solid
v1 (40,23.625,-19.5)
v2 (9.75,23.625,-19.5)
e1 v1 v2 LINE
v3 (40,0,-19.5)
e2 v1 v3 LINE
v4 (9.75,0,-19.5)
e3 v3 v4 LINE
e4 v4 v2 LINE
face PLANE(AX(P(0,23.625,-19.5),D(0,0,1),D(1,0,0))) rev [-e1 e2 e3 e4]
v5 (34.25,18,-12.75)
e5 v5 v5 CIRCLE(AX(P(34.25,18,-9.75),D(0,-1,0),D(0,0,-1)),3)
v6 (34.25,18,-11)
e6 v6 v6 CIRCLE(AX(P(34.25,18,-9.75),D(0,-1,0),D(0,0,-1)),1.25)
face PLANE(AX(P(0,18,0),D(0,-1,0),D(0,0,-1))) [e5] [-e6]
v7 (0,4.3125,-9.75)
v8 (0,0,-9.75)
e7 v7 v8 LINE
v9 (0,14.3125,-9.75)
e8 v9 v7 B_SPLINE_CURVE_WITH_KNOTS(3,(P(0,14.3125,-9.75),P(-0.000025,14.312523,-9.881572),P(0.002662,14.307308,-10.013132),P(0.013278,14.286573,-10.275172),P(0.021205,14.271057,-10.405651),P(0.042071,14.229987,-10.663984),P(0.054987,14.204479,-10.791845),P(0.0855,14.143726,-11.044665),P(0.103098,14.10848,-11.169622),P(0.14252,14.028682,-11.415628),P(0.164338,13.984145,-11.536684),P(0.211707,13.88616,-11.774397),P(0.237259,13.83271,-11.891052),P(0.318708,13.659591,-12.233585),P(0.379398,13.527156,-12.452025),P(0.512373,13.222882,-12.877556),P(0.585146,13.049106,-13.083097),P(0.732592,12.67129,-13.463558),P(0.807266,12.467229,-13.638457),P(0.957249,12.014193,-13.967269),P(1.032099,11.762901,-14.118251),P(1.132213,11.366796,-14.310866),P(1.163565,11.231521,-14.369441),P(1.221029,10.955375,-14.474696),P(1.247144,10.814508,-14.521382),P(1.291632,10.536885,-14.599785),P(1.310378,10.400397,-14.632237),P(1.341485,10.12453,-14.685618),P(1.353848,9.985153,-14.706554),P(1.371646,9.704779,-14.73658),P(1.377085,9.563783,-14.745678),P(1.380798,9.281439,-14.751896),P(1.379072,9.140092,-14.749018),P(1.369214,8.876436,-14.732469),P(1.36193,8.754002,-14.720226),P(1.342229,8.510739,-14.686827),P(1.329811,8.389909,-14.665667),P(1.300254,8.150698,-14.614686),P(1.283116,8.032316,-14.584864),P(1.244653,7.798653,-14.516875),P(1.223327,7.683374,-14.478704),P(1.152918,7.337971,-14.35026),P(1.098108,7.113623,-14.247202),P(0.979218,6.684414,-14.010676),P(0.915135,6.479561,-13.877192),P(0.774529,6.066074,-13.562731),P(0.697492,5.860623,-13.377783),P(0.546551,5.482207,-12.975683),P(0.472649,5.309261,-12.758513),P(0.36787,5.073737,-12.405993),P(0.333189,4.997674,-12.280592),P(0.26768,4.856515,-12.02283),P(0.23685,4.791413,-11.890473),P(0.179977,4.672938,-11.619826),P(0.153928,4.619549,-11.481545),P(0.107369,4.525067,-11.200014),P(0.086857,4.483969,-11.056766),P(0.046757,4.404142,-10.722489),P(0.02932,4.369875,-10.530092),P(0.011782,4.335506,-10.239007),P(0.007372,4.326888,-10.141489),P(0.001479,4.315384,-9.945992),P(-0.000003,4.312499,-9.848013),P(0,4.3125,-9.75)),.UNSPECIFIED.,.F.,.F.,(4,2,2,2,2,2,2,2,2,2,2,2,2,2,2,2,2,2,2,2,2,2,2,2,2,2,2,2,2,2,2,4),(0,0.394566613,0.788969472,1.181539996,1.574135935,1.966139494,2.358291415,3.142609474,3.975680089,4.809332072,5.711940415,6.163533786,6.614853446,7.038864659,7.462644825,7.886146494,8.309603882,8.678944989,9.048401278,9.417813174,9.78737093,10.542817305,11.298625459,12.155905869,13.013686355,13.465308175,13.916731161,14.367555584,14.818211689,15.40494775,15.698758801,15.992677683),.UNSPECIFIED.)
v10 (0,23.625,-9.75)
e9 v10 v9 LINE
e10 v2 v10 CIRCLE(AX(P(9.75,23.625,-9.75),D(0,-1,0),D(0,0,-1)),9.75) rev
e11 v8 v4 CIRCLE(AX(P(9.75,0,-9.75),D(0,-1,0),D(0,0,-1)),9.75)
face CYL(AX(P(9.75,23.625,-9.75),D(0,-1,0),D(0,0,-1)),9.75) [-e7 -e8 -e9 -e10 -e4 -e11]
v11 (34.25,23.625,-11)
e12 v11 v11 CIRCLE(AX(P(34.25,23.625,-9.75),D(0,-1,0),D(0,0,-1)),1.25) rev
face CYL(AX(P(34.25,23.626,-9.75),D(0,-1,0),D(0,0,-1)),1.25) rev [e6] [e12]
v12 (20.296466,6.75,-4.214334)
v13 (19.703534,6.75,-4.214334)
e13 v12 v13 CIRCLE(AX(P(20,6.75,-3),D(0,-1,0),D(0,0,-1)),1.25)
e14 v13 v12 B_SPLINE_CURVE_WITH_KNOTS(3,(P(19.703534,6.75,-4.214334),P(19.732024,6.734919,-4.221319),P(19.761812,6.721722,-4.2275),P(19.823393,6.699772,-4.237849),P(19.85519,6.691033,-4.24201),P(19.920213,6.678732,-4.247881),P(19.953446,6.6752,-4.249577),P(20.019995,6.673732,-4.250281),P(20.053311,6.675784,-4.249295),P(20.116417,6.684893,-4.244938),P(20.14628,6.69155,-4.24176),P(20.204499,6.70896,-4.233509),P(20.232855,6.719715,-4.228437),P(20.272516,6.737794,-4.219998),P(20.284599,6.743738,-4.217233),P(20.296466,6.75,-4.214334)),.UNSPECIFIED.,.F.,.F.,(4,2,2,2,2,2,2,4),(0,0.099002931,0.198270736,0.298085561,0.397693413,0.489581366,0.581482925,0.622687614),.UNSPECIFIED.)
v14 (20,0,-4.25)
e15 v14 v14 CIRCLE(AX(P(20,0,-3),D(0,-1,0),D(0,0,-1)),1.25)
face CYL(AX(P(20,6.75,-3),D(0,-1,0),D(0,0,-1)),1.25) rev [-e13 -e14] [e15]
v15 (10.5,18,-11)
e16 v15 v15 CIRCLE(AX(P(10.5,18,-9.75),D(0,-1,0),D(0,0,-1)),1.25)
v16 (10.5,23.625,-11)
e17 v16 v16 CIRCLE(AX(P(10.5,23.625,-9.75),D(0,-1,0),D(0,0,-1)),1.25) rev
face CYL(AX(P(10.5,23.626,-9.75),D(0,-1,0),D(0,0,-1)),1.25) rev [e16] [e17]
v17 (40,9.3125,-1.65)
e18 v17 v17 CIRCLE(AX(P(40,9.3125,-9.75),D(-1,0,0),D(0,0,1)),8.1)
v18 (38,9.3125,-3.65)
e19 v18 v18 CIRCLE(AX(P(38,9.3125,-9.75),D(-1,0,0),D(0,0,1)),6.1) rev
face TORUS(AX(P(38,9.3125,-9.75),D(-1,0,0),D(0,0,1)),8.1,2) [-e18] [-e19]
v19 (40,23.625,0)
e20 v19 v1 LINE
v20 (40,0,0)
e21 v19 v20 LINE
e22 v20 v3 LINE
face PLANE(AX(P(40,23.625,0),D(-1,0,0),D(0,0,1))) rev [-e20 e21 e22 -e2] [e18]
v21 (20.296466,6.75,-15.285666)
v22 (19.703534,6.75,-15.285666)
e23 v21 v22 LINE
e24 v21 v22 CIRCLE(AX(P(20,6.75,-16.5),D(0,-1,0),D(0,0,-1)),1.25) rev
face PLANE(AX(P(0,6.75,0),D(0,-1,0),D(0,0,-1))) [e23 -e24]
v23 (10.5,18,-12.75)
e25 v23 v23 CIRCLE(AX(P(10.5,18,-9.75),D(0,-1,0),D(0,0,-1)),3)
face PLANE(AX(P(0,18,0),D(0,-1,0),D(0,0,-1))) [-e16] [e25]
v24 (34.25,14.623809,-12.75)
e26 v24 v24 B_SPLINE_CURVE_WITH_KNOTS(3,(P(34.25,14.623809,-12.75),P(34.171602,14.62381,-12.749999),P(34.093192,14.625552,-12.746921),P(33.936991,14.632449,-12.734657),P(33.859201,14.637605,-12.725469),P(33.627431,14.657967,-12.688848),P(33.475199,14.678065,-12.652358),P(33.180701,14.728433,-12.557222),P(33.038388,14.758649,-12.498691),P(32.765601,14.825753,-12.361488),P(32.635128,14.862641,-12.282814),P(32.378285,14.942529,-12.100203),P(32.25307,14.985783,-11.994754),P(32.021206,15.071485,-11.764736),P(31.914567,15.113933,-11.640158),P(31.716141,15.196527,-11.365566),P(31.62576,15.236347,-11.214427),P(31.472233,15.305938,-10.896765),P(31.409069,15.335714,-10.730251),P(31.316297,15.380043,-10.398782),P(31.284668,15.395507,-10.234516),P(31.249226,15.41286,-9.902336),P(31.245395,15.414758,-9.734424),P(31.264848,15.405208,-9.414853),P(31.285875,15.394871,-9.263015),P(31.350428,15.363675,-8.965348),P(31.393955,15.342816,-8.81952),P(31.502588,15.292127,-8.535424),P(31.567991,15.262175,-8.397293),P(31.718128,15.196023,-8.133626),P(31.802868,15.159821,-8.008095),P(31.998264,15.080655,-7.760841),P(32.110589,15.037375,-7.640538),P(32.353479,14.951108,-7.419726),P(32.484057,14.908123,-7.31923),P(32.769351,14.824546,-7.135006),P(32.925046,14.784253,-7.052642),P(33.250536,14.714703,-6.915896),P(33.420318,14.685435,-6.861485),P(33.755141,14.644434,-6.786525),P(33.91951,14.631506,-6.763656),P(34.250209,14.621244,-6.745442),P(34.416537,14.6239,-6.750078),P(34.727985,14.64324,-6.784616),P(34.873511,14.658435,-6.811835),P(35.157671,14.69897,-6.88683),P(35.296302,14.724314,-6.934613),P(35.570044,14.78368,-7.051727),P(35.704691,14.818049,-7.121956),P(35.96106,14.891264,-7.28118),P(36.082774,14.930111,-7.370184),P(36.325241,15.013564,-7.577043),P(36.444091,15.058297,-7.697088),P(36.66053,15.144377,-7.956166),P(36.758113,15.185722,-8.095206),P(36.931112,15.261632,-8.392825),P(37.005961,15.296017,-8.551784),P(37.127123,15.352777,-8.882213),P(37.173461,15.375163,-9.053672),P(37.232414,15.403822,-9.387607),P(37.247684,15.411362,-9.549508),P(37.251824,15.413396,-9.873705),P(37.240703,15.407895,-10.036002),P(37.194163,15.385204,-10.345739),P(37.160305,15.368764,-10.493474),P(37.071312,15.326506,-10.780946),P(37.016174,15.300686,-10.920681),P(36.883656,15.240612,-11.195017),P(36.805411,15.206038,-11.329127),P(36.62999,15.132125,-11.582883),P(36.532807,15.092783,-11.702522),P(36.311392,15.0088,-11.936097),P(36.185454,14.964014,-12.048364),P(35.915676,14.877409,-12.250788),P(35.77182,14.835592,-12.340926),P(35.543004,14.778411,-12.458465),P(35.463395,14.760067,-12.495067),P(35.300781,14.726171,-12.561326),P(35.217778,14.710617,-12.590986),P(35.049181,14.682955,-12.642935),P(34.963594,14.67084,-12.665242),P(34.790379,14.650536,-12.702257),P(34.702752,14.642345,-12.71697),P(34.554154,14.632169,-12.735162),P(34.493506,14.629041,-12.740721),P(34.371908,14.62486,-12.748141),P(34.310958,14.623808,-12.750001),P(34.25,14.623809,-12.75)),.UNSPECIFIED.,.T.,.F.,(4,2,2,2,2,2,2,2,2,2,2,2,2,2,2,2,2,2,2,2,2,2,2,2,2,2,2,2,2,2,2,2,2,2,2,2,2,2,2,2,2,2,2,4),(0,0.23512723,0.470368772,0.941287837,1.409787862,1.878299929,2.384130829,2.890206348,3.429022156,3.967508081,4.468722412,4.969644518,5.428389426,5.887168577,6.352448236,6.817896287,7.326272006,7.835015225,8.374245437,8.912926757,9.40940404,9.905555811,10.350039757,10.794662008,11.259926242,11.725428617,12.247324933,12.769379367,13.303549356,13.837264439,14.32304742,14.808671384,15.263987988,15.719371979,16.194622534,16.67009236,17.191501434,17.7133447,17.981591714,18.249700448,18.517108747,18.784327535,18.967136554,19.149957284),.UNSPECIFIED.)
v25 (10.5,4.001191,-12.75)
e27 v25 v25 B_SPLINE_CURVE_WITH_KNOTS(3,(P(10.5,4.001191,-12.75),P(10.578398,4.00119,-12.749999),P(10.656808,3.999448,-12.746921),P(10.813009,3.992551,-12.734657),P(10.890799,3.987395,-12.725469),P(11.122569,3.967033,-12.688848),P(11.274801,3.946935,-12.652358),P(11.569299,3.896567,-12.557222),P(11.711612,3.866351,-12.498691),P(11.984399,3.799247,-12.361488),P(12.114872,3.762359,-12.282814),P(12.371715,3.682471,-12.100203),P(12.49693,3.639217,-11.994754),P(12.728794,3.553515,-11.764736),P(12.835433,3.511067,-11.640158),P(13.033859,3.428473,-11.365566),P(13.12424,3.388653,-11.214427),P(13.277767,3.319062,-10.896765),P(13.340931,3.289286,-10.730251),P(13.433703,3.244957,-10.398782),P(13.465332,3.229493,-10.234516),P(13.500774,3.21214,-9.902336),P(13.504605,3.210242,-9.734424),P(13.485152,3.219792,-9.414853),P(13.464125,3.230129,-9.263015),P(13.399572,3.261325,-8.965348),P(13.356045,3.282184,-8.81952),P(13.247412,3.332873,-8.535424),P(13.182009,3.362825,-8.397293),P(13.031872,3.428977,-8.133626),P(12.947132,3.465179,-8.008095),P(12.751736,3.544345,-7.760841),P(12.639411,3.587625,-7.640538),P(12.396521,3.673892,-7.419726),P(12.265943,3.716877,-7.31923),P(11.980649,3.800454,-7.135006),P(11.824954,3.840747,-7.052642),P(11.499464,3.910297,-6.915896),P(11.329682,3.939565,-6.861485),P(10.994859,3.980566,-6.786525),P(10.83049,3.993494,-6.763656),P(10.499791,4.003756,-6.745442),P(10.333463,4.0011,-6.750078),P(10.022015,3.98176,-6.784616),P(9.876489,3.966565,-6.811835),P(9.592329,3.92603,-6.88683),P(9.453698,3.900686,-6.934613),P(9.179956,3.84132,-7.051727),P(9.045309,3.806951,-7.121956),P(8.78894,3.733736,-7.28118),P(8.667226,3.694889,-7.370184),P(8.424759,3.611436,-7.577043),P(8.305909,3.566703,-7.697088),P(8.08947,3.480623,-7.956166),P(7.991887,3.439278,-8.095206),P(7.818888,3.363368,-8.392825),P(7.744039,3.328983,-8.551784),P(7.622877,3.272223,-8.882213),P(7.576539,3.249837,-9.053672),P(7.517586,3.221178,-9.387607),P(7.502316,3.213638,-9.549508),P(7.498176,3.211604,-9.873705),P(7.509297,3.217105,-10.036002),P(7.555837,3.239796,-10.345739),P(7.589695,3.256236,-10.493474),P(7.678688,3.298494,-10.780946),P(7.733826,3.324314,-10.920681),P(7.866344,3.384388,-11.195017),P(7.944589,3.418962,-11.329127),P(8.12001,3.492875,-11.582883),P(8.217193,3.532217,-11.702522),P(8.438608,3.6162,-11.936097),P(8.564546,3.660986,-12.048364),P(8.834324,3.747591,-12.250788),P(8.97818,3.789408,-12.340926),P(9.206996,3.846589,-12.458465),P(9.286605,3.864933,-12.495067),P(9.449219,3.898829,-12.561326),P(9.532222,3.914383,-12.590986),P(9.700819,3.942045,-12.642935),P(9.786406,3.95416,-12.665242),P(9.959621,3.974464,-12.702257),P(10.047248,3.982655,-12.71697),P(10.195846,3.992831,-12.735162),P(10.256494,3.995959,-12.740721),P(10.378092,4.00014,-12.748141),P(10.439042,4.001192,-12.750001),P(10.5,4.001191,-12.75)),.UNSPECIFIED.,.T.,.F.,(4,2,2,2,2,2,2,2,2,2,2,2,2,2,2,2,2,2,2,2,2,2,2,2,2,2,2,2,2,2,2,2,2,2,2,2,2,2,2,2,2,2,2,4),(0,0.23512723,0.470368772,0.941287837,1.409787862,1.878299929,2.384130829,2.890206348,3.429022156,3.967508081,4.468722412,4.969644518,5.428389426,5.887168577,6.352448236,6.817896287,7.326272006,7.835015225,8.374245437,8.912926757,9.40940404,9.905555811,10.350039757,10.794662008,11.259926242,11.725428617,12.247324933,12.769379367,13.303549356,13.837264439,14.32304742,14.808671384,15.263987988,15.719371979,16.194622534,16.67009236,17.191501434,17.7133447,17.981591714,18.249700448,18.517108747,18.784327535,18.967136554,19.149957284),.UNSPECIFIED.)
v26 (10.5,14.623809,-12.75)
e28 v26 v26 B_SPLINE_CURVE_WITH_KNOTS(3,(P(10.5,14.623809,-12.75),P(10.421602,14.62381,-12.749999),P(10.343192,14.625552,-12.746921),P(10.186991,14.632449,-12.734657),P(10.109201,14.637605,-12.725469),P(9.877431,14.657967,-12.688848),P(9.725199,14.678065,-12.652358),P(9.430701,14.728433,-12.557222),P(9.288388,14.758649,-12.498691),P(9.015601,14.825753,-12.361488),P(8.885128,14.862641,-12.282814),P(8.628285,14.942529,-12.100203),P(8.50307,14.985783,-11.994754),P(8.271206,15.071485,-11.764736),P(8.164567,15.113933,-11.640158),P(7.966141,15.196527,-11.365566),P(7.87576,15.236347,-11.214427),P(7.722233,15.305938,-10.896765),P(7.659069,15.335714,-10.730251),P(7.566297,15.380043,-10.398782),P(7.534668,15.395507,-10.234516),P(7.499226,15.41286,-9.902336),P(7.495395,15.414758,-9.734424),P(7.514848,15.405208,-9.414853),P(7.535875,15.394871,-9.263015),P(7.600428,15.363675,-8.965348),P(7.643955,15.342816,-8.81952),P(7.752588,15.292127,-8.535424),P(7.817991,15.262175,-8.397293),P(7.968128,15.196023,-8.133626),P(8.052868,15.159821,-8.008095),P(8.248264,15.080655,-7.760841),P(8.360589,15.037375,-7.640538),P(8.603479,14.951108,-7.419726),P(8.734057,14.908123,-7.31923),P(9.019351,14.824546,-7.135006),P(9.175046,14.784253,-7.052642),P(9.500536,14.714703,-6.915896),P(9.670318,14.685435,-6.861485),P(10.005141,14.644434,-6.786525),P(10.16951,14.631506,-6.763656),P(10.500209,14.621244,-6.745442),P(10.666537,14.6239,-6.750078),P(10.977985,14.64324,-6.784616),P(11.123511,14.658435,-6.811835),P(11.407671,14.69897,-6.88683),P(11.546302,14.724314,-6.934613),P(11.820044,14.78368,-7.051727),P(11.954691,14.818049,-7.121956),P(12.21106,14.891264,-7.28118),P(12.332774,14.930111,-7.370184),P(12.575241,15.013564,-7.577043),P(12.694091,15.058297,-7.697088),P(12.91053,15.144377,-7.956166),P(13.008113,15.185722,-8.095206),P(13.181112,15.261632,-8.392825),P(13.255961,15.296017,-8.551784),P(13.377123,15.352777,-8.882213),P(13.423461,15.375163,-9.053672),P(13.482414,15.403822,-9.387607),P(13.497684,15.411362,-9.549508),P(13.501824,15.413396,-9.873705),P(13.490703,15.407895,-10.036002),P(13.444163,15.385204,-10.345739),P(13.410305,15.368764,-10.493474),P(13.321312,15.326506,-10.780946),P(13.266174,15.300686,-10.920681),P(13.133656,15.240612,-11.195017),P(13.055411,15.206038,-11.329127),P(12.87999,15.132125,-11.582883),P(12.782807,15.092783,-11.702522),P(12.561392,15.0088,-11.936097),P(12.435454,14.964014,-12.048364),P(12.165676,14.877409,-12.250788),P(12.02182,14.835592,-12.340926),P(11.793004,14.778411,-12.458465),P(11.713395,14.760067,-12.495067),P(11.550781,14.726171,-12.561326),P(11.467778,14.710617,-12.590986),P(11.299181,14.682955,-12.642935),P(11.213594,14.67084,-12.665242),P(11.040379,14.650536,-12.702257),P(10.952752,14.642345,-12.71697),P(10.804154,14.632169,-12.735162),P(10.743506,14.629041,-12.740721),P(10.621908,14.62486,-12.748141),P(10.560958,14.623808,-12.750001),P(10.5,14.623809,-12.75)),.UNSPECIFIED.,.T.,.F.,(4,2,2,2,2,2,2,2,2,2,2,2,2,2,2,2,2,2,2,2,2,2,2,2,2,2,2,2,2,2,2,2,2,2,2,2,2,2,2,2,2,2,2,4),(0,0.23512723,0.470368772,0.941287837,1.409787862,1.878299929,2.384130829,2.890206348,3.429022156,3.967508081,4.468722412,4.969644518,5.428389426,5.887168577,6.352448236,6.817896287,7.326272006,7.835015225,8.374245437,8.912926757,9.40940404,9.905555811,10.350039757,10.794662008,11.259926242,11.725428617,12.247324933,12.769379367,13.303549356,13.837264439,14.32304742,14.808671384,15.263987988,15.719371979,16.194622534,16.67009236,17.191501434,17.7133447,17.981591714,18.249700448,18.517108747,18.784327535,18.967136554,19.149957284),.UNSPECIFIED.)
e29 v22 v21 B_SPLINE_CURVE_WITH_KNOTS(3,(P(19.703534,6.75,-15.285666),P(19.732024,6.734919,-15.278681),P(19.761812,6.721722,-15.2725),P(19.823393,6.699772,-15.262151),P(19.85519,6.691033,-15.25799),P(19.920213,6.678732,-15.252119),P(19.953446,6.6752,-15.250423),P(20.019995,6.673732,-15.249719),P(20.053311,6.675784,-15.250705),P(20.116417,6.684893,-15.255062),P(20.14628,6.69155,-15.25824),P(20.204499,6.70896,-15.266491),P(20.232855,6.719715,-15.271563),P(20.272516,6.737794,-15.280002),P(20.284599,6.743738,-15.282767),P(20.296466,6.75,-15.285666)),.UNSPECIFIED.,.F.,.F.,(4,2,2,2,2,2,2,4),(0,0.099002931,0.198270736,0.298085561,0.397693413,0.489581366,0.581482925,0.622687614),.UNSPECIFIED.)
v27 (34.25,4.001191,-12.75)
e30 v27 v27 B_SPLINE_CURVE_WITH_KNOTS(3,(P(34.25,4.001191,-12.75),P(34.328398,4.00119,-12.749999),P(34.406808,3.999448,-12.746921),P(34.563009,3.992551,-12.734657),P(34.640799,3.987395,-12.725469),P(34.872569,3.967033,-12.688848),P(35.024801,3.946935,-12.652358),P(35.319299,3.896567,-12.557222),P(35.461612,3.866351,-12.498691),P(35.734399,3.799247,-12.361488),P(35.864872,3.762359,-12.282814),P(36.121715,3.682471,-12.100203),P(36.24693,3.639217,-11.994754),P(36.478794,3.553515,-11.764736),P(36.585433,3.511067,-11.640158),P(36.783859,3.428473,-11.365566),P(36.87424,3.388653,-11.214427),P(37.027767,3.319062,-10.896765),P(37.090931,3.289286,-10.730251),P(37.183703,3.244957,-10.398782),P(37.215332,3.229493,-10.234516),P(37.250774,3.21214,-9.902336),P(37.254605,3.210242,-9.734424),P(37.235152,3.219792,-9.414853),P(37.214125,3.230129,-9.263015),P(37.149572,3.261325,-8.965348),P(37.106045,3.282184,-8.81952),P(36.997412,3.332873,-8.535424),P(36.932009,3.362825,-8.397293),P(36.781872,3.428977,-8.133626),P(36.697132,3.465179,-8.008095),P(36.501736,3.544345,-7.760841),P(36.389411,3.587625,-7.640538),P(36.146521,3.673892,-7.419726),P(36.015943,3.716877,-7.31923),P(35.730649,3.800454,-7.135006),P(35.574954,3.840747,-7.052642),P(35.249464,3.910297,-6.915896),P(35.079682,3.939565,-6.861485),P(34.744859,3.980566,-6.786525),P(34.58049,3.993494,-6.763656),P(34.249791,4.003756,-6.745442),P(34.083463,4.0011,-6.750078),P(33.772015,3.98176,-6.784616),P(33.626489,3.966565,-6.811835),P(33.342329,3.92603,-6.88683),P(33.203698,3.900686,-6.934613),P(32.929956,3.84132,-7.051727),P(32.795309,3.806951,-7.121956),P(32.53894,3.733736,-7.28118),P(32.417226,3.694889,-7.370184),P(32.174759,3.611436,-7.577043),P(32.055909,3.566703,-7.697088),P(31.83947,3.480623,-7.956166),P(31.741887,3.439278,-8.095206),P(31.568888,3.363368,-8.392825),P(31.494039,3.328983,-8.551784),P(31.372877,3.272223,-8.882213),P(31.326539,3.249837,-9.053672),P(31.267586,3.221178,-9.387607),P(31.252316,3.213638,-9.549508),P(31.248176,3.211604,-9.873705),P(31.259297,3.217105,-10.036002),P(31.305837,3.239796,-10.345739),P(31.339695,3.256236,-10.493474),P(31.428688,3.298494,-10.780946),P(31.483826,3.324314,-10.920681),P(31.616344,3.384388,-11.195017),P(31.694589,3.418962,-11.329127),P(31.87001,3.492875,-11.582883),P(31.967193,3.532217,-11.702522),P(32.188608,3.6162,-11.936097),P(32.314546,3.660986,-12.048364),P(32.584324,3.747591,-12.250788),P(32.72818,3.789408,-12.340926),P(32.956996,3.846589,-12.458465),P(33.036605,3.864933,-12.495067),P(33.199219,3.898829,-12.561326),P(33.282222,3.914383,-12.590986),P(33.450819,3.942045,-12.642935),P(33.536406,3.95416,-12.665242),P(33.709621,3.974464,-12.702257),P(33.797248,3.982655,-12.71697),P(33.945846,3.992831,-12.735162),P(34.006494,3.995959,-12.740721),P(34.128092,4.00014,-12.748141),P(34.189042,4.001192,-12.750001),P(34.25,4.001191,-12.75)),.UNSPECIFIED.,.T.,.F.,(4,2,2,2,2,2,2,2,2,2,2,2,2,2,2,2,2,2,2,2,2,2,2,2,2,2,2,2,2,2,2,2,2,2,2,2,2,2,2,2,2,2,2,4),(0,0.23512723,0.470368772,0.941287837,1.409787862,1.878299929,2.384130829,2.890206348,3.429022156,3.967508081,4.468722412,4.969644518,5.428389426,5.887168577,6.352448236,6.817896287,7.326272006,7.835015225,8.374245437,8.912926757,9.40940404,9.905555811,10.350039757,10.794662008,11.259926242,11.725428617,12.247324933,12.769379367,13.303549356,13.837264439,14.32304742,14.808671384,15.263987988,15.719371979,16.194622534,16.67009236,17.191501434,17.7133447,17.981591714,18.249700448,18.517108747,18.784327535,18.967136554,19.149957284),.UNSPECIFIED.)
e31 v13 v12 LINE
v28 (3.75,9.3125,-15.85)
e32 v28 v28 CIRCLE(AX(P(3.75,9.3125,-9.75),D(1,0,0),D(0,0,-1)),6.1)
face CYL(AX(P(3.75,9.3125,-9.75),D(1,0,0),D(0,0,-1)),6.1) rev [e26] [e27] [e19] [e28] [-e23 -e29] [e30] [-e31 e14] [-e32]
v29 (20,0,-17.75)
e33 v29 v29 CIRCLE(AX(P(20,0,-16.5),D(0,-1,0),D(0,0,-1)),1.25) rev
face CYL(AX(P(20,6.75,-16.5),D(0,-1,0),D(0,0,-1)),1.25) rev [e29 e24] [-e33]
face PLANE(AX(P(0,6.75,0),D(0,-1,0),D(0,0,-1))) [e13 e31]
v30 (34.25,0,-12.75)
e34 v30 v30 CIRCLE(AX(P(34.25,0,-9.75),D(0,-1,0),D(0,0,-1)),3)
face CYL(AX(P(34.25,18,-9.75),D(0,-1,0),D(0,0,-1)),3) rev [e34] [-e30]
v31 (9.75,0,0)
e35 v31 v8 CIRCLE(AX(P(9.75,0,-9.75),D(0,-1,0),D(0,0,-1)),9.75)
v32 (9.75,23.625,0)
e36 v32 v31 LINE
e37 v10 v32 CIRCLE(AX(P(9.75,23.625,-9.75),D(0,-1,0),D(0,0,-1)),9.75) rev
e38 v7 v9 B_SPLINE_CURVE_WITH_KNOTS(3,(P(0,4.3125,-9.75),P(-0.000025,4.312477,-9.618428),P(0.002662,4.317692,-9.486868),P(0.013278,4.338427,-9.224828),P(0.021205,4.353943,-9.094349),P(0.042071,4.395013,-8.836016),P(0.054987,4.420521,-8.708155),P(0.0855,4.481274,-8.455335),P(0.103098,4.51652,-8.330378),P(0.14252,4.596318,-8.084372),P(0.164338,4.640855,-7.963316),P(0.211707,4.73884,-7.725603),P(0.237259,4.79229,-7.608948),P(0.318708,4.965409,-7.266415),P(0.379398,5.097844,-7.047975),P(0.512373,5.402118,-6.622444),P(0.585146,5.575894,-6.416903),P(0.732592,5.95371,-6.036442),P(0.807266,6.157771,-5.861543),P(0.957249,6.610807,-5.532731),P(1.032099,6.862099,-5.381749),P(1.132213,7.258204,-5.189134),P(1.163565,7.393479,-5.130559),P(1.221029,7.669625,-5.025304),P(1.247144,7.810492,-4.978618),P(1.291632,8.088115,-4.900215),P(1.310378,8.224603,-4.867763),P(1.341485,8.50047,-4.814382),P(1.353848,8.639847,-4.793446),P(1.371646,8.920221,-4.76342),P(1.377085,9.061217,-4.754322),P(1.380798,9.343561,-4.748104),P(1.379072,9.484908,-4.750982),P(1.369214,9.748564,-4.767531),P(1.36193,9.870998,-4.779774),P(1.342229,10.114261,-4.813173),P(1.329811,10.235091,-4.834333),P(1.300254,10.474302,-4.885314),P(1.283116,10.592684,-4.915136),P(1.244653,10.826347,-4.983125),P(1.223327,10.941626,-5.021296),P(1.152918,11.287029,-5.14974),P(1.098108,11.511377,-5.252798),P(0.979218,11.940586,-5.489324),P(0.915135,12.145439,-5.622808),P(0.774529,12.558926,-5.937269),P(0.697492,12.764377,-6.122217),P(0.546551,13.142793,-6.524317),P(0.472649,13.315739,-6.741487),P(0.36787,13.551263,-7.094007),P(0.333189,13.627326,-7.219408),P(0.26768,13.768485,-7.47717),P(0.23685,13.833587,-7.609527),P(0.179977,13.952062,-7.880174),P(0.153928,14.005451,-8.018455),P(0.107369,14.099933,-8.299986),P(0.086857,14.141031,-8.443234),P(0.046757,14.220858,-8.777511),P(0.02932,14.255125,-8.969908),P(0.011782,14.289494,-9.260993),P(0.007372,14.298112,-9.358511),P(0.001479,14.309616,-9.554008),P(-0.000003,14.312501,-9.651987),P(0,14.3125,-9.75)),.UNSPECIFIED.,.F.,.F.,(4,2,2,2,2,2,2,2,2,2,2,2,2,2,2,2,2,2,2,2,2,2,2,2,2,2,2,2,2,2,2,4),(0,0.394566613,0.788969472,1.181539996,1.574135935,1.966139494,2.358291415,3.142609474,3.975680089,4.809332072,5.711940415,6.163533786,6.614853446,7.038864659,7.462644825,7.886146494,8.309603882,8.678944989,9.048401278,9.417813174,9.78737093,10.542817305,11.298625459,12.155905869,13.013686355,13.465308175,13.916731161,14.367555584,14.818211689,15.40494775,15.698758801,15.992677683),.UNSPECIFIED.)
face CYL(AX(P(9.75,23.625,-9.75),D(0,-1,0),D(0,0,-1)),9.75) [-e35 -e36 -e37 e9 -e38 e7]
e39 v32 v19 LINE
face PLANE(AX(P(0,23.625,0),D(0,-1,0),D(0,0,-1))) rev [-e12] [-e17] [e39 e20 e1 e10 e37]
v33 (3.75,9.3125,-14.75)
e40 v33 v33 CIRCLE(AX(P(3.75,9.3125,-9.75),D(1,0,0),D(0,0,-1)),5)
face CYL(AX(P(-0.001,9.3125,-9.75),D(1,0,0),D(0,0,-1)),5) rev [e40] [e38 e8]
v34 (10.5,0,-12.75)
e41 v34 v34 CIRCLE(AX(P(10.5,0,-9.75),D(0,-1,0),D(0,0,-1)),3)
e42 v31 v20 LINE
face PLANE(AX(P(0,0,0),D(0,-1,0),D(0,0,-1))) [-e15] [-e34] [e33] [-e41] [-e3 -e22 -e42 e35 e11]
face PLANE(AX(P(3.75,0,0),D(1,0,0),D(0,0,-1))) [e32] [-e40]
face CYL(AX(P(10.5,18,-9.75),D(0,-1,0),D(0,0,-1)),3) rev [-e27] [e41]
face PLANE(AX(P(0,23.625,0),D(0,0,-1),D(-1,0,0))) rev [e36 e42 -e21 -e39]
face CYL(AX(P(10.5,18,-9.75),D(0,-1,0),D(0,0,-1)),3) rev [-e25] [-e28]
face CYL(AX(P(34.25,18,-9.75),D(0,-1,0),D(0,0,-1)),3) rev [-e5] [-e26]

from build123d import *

# Parameters (mm, degrees)
SKETCH1_W           = 40
SKETCH1_H           = 19.5
BOSS_EXTRUDE1_DEPTH = 23.625
SKETCH2_R           = 6.1
CUT_EXTRUDE1_DEPTH  = 36.25
CUT_EXTRUDE2_REACH  = 49.46
SKETCH3_R           = 5
SKETCH5_R           = 3
CUT_EXTRUDE3_DEPTH  = 18
CUT_EXTRUDE4_REACH  = 50.003
SKETCH6_R           = 1.25
SKETCH7_R           = 1.25
CUT_EXTRUDE5_DEPTH  = 6.75
FILLET1_R           = 2
FILLET2_DEPTH       = 23.625


with BuildPart() as part:
    # Sketch1 → Boss-Extrude1 (new body)
    with BuildSketch(Plane(origin=(0, 0, 0), x_dir=(1, 0, 0), z_dir=(0, 1, 0))):
        with Locations((20, 9.75)):
            Rectangle(SKETCH1_W, SKETCH1_H)
    extrude(amount=BOSS_EXTRUDE1_DEPTH)

    # Sketch2 → Cut-Extrude1 (cut)
    with BuildSketch(Plane(origin=(40, 0, 0), x_dir=(0, 0, -1), z_dir=(1, 0, 0))):
        with Locations((9.75, 9.3125)):
            Circle(SKETCH2_R)
    extrude(amount=-CUT_EXTRUDE1_DEPTH, mode=Mode.SUBTRACT)

    # Sketch3 → Cut-Extrude2 (cut, up to next)
    with BuildSketch(Plane(origin=(3.75, 0, 0), x_dir=(0, 0, -1), z_dir=(1, 0, 0)), mode=Mode.PRIVATE) as cut_extrude2_sk1:
        with Locations((9.75, 9.3125)):
            Circle(SKETCH3_R)
    cut_extrude2_tool1 = extrude(cut_extrude2_sk1.sketch, amount=-CUT_EXTRUDE2_REACH, mode=Mode.PRIVATE) & part.part
    add(cut_extrude2_tool1.solids().sort_by_distance((3.75, 9.3125, -9.75))[0], mode=Mode.SUBTRACT)

    # Sketch5 → Cut-Extrude3 (cut)
    with BuildSketch(Plane.XZ):
        with Locations(Location((34.25, -9.75, 0), (0, 0, 270))):
            Circle(SKETCH5_R)
        with Locations(Location((10.5, -9.75, 0), (0, 0, 270))):
            Circle(SKETCH5_R)
    extrude(amount=-CUT_EXTRUDE3_DEPTH, mode=Mode.SUBTRACT)

    # Sketch6 → Cut-Extrude4 (cut, up to next)
    with BuildSketch(Plane.XZ.offset(-18), mode=Mode.PRIVATE) as cut_extrude4_sk1:
        with Locations(Location((10.5, -9.75, 0), (0, 0, 270))):
            Circle(SKETCH6_R)
    cut_extrude4_tool1 = extrude(cut_extrude4_sk1.sketch, amount=-CUT_EXTRUDE4_REACH, mode=Mode.PRIVATE) & part.part
    # Sketch6 → Cut-Extrude4 (cut, up to next)
    with BuildSketch(Plane.XZ.offset(-18), mode=Mode.PRIVATE) as cut_extrude4_sk2:
        with Locations(Location((34.25, -9.75, 0), (0, 0, 270))):
            Circle(SKETCH6_R)
    cut_extrude4_tool2 = extrude(cut_extrude4_sk2.sketch, amount=-CUT_EXTRUDE4_REACH, mode=Mode.PRIVATE) & part.part
    add(cut_extrude4_tool1.solids().sort_by_distance((10.5, 18, -9.75))[0], mode=Mode.SUBTRACT)
    add(cut_extrude4_tool2.solids().sort_by_distance((34.25, 18, -9.75))[0], mode=Mode.SUBTRACT)

    # Sketch7 → Cut-Extrude5 (cut)
    with BuildSketch(Plane.XZ):
        with Locations(Location((20, -3, 0), (0, 0, 270))):
            Circle(SKETCH7_R)
        with Locations(Location((20, -16.5, 0), (0, 0, 270))):
            Circle(SKETCH7_R)
    extrude(amount=-CUT_EXTRUDE5_DEPTH, mode=Mode.SUBTRACT)

    # Fillet1
    fillet1_edges = [part.edges().sort_by_distance(p)[0] for p in [
        (40, 9.3125, -3.65),
    ]]
    fillet(fillet1_edges, radius=FILLET1_R)

    # Fillet2: read off the stored shape, not the designer's step
    # Fillet2 outline → Fillet2 (cut)
    with BuildSketch(Plane(origin=(0, 0, 0), x_dir=(1, 0, 0), z_dir=(0, 1, 0))):
        with BuildLine():
            Line((0, 19.5), (0, 9.75))
            ThreePointArc((0, 9.75), (2.855708883, 16.644291117), (9.75, 19.5))
            Line((9.75, 19.5), (0, 19.5))
        make_face()
        with BuildLine():
            ThreePointArc((9.75, 0), (2.855708883, 2.855708883), (0, 9.75))
            Line((0, 9.75), (0, 0))
            Line((0, 0), (9.75, 0))
        make_face()
    extrude(amount=FILLET2_DEPTH, mode=Mode.SUBTRACT)


solid = part.part
